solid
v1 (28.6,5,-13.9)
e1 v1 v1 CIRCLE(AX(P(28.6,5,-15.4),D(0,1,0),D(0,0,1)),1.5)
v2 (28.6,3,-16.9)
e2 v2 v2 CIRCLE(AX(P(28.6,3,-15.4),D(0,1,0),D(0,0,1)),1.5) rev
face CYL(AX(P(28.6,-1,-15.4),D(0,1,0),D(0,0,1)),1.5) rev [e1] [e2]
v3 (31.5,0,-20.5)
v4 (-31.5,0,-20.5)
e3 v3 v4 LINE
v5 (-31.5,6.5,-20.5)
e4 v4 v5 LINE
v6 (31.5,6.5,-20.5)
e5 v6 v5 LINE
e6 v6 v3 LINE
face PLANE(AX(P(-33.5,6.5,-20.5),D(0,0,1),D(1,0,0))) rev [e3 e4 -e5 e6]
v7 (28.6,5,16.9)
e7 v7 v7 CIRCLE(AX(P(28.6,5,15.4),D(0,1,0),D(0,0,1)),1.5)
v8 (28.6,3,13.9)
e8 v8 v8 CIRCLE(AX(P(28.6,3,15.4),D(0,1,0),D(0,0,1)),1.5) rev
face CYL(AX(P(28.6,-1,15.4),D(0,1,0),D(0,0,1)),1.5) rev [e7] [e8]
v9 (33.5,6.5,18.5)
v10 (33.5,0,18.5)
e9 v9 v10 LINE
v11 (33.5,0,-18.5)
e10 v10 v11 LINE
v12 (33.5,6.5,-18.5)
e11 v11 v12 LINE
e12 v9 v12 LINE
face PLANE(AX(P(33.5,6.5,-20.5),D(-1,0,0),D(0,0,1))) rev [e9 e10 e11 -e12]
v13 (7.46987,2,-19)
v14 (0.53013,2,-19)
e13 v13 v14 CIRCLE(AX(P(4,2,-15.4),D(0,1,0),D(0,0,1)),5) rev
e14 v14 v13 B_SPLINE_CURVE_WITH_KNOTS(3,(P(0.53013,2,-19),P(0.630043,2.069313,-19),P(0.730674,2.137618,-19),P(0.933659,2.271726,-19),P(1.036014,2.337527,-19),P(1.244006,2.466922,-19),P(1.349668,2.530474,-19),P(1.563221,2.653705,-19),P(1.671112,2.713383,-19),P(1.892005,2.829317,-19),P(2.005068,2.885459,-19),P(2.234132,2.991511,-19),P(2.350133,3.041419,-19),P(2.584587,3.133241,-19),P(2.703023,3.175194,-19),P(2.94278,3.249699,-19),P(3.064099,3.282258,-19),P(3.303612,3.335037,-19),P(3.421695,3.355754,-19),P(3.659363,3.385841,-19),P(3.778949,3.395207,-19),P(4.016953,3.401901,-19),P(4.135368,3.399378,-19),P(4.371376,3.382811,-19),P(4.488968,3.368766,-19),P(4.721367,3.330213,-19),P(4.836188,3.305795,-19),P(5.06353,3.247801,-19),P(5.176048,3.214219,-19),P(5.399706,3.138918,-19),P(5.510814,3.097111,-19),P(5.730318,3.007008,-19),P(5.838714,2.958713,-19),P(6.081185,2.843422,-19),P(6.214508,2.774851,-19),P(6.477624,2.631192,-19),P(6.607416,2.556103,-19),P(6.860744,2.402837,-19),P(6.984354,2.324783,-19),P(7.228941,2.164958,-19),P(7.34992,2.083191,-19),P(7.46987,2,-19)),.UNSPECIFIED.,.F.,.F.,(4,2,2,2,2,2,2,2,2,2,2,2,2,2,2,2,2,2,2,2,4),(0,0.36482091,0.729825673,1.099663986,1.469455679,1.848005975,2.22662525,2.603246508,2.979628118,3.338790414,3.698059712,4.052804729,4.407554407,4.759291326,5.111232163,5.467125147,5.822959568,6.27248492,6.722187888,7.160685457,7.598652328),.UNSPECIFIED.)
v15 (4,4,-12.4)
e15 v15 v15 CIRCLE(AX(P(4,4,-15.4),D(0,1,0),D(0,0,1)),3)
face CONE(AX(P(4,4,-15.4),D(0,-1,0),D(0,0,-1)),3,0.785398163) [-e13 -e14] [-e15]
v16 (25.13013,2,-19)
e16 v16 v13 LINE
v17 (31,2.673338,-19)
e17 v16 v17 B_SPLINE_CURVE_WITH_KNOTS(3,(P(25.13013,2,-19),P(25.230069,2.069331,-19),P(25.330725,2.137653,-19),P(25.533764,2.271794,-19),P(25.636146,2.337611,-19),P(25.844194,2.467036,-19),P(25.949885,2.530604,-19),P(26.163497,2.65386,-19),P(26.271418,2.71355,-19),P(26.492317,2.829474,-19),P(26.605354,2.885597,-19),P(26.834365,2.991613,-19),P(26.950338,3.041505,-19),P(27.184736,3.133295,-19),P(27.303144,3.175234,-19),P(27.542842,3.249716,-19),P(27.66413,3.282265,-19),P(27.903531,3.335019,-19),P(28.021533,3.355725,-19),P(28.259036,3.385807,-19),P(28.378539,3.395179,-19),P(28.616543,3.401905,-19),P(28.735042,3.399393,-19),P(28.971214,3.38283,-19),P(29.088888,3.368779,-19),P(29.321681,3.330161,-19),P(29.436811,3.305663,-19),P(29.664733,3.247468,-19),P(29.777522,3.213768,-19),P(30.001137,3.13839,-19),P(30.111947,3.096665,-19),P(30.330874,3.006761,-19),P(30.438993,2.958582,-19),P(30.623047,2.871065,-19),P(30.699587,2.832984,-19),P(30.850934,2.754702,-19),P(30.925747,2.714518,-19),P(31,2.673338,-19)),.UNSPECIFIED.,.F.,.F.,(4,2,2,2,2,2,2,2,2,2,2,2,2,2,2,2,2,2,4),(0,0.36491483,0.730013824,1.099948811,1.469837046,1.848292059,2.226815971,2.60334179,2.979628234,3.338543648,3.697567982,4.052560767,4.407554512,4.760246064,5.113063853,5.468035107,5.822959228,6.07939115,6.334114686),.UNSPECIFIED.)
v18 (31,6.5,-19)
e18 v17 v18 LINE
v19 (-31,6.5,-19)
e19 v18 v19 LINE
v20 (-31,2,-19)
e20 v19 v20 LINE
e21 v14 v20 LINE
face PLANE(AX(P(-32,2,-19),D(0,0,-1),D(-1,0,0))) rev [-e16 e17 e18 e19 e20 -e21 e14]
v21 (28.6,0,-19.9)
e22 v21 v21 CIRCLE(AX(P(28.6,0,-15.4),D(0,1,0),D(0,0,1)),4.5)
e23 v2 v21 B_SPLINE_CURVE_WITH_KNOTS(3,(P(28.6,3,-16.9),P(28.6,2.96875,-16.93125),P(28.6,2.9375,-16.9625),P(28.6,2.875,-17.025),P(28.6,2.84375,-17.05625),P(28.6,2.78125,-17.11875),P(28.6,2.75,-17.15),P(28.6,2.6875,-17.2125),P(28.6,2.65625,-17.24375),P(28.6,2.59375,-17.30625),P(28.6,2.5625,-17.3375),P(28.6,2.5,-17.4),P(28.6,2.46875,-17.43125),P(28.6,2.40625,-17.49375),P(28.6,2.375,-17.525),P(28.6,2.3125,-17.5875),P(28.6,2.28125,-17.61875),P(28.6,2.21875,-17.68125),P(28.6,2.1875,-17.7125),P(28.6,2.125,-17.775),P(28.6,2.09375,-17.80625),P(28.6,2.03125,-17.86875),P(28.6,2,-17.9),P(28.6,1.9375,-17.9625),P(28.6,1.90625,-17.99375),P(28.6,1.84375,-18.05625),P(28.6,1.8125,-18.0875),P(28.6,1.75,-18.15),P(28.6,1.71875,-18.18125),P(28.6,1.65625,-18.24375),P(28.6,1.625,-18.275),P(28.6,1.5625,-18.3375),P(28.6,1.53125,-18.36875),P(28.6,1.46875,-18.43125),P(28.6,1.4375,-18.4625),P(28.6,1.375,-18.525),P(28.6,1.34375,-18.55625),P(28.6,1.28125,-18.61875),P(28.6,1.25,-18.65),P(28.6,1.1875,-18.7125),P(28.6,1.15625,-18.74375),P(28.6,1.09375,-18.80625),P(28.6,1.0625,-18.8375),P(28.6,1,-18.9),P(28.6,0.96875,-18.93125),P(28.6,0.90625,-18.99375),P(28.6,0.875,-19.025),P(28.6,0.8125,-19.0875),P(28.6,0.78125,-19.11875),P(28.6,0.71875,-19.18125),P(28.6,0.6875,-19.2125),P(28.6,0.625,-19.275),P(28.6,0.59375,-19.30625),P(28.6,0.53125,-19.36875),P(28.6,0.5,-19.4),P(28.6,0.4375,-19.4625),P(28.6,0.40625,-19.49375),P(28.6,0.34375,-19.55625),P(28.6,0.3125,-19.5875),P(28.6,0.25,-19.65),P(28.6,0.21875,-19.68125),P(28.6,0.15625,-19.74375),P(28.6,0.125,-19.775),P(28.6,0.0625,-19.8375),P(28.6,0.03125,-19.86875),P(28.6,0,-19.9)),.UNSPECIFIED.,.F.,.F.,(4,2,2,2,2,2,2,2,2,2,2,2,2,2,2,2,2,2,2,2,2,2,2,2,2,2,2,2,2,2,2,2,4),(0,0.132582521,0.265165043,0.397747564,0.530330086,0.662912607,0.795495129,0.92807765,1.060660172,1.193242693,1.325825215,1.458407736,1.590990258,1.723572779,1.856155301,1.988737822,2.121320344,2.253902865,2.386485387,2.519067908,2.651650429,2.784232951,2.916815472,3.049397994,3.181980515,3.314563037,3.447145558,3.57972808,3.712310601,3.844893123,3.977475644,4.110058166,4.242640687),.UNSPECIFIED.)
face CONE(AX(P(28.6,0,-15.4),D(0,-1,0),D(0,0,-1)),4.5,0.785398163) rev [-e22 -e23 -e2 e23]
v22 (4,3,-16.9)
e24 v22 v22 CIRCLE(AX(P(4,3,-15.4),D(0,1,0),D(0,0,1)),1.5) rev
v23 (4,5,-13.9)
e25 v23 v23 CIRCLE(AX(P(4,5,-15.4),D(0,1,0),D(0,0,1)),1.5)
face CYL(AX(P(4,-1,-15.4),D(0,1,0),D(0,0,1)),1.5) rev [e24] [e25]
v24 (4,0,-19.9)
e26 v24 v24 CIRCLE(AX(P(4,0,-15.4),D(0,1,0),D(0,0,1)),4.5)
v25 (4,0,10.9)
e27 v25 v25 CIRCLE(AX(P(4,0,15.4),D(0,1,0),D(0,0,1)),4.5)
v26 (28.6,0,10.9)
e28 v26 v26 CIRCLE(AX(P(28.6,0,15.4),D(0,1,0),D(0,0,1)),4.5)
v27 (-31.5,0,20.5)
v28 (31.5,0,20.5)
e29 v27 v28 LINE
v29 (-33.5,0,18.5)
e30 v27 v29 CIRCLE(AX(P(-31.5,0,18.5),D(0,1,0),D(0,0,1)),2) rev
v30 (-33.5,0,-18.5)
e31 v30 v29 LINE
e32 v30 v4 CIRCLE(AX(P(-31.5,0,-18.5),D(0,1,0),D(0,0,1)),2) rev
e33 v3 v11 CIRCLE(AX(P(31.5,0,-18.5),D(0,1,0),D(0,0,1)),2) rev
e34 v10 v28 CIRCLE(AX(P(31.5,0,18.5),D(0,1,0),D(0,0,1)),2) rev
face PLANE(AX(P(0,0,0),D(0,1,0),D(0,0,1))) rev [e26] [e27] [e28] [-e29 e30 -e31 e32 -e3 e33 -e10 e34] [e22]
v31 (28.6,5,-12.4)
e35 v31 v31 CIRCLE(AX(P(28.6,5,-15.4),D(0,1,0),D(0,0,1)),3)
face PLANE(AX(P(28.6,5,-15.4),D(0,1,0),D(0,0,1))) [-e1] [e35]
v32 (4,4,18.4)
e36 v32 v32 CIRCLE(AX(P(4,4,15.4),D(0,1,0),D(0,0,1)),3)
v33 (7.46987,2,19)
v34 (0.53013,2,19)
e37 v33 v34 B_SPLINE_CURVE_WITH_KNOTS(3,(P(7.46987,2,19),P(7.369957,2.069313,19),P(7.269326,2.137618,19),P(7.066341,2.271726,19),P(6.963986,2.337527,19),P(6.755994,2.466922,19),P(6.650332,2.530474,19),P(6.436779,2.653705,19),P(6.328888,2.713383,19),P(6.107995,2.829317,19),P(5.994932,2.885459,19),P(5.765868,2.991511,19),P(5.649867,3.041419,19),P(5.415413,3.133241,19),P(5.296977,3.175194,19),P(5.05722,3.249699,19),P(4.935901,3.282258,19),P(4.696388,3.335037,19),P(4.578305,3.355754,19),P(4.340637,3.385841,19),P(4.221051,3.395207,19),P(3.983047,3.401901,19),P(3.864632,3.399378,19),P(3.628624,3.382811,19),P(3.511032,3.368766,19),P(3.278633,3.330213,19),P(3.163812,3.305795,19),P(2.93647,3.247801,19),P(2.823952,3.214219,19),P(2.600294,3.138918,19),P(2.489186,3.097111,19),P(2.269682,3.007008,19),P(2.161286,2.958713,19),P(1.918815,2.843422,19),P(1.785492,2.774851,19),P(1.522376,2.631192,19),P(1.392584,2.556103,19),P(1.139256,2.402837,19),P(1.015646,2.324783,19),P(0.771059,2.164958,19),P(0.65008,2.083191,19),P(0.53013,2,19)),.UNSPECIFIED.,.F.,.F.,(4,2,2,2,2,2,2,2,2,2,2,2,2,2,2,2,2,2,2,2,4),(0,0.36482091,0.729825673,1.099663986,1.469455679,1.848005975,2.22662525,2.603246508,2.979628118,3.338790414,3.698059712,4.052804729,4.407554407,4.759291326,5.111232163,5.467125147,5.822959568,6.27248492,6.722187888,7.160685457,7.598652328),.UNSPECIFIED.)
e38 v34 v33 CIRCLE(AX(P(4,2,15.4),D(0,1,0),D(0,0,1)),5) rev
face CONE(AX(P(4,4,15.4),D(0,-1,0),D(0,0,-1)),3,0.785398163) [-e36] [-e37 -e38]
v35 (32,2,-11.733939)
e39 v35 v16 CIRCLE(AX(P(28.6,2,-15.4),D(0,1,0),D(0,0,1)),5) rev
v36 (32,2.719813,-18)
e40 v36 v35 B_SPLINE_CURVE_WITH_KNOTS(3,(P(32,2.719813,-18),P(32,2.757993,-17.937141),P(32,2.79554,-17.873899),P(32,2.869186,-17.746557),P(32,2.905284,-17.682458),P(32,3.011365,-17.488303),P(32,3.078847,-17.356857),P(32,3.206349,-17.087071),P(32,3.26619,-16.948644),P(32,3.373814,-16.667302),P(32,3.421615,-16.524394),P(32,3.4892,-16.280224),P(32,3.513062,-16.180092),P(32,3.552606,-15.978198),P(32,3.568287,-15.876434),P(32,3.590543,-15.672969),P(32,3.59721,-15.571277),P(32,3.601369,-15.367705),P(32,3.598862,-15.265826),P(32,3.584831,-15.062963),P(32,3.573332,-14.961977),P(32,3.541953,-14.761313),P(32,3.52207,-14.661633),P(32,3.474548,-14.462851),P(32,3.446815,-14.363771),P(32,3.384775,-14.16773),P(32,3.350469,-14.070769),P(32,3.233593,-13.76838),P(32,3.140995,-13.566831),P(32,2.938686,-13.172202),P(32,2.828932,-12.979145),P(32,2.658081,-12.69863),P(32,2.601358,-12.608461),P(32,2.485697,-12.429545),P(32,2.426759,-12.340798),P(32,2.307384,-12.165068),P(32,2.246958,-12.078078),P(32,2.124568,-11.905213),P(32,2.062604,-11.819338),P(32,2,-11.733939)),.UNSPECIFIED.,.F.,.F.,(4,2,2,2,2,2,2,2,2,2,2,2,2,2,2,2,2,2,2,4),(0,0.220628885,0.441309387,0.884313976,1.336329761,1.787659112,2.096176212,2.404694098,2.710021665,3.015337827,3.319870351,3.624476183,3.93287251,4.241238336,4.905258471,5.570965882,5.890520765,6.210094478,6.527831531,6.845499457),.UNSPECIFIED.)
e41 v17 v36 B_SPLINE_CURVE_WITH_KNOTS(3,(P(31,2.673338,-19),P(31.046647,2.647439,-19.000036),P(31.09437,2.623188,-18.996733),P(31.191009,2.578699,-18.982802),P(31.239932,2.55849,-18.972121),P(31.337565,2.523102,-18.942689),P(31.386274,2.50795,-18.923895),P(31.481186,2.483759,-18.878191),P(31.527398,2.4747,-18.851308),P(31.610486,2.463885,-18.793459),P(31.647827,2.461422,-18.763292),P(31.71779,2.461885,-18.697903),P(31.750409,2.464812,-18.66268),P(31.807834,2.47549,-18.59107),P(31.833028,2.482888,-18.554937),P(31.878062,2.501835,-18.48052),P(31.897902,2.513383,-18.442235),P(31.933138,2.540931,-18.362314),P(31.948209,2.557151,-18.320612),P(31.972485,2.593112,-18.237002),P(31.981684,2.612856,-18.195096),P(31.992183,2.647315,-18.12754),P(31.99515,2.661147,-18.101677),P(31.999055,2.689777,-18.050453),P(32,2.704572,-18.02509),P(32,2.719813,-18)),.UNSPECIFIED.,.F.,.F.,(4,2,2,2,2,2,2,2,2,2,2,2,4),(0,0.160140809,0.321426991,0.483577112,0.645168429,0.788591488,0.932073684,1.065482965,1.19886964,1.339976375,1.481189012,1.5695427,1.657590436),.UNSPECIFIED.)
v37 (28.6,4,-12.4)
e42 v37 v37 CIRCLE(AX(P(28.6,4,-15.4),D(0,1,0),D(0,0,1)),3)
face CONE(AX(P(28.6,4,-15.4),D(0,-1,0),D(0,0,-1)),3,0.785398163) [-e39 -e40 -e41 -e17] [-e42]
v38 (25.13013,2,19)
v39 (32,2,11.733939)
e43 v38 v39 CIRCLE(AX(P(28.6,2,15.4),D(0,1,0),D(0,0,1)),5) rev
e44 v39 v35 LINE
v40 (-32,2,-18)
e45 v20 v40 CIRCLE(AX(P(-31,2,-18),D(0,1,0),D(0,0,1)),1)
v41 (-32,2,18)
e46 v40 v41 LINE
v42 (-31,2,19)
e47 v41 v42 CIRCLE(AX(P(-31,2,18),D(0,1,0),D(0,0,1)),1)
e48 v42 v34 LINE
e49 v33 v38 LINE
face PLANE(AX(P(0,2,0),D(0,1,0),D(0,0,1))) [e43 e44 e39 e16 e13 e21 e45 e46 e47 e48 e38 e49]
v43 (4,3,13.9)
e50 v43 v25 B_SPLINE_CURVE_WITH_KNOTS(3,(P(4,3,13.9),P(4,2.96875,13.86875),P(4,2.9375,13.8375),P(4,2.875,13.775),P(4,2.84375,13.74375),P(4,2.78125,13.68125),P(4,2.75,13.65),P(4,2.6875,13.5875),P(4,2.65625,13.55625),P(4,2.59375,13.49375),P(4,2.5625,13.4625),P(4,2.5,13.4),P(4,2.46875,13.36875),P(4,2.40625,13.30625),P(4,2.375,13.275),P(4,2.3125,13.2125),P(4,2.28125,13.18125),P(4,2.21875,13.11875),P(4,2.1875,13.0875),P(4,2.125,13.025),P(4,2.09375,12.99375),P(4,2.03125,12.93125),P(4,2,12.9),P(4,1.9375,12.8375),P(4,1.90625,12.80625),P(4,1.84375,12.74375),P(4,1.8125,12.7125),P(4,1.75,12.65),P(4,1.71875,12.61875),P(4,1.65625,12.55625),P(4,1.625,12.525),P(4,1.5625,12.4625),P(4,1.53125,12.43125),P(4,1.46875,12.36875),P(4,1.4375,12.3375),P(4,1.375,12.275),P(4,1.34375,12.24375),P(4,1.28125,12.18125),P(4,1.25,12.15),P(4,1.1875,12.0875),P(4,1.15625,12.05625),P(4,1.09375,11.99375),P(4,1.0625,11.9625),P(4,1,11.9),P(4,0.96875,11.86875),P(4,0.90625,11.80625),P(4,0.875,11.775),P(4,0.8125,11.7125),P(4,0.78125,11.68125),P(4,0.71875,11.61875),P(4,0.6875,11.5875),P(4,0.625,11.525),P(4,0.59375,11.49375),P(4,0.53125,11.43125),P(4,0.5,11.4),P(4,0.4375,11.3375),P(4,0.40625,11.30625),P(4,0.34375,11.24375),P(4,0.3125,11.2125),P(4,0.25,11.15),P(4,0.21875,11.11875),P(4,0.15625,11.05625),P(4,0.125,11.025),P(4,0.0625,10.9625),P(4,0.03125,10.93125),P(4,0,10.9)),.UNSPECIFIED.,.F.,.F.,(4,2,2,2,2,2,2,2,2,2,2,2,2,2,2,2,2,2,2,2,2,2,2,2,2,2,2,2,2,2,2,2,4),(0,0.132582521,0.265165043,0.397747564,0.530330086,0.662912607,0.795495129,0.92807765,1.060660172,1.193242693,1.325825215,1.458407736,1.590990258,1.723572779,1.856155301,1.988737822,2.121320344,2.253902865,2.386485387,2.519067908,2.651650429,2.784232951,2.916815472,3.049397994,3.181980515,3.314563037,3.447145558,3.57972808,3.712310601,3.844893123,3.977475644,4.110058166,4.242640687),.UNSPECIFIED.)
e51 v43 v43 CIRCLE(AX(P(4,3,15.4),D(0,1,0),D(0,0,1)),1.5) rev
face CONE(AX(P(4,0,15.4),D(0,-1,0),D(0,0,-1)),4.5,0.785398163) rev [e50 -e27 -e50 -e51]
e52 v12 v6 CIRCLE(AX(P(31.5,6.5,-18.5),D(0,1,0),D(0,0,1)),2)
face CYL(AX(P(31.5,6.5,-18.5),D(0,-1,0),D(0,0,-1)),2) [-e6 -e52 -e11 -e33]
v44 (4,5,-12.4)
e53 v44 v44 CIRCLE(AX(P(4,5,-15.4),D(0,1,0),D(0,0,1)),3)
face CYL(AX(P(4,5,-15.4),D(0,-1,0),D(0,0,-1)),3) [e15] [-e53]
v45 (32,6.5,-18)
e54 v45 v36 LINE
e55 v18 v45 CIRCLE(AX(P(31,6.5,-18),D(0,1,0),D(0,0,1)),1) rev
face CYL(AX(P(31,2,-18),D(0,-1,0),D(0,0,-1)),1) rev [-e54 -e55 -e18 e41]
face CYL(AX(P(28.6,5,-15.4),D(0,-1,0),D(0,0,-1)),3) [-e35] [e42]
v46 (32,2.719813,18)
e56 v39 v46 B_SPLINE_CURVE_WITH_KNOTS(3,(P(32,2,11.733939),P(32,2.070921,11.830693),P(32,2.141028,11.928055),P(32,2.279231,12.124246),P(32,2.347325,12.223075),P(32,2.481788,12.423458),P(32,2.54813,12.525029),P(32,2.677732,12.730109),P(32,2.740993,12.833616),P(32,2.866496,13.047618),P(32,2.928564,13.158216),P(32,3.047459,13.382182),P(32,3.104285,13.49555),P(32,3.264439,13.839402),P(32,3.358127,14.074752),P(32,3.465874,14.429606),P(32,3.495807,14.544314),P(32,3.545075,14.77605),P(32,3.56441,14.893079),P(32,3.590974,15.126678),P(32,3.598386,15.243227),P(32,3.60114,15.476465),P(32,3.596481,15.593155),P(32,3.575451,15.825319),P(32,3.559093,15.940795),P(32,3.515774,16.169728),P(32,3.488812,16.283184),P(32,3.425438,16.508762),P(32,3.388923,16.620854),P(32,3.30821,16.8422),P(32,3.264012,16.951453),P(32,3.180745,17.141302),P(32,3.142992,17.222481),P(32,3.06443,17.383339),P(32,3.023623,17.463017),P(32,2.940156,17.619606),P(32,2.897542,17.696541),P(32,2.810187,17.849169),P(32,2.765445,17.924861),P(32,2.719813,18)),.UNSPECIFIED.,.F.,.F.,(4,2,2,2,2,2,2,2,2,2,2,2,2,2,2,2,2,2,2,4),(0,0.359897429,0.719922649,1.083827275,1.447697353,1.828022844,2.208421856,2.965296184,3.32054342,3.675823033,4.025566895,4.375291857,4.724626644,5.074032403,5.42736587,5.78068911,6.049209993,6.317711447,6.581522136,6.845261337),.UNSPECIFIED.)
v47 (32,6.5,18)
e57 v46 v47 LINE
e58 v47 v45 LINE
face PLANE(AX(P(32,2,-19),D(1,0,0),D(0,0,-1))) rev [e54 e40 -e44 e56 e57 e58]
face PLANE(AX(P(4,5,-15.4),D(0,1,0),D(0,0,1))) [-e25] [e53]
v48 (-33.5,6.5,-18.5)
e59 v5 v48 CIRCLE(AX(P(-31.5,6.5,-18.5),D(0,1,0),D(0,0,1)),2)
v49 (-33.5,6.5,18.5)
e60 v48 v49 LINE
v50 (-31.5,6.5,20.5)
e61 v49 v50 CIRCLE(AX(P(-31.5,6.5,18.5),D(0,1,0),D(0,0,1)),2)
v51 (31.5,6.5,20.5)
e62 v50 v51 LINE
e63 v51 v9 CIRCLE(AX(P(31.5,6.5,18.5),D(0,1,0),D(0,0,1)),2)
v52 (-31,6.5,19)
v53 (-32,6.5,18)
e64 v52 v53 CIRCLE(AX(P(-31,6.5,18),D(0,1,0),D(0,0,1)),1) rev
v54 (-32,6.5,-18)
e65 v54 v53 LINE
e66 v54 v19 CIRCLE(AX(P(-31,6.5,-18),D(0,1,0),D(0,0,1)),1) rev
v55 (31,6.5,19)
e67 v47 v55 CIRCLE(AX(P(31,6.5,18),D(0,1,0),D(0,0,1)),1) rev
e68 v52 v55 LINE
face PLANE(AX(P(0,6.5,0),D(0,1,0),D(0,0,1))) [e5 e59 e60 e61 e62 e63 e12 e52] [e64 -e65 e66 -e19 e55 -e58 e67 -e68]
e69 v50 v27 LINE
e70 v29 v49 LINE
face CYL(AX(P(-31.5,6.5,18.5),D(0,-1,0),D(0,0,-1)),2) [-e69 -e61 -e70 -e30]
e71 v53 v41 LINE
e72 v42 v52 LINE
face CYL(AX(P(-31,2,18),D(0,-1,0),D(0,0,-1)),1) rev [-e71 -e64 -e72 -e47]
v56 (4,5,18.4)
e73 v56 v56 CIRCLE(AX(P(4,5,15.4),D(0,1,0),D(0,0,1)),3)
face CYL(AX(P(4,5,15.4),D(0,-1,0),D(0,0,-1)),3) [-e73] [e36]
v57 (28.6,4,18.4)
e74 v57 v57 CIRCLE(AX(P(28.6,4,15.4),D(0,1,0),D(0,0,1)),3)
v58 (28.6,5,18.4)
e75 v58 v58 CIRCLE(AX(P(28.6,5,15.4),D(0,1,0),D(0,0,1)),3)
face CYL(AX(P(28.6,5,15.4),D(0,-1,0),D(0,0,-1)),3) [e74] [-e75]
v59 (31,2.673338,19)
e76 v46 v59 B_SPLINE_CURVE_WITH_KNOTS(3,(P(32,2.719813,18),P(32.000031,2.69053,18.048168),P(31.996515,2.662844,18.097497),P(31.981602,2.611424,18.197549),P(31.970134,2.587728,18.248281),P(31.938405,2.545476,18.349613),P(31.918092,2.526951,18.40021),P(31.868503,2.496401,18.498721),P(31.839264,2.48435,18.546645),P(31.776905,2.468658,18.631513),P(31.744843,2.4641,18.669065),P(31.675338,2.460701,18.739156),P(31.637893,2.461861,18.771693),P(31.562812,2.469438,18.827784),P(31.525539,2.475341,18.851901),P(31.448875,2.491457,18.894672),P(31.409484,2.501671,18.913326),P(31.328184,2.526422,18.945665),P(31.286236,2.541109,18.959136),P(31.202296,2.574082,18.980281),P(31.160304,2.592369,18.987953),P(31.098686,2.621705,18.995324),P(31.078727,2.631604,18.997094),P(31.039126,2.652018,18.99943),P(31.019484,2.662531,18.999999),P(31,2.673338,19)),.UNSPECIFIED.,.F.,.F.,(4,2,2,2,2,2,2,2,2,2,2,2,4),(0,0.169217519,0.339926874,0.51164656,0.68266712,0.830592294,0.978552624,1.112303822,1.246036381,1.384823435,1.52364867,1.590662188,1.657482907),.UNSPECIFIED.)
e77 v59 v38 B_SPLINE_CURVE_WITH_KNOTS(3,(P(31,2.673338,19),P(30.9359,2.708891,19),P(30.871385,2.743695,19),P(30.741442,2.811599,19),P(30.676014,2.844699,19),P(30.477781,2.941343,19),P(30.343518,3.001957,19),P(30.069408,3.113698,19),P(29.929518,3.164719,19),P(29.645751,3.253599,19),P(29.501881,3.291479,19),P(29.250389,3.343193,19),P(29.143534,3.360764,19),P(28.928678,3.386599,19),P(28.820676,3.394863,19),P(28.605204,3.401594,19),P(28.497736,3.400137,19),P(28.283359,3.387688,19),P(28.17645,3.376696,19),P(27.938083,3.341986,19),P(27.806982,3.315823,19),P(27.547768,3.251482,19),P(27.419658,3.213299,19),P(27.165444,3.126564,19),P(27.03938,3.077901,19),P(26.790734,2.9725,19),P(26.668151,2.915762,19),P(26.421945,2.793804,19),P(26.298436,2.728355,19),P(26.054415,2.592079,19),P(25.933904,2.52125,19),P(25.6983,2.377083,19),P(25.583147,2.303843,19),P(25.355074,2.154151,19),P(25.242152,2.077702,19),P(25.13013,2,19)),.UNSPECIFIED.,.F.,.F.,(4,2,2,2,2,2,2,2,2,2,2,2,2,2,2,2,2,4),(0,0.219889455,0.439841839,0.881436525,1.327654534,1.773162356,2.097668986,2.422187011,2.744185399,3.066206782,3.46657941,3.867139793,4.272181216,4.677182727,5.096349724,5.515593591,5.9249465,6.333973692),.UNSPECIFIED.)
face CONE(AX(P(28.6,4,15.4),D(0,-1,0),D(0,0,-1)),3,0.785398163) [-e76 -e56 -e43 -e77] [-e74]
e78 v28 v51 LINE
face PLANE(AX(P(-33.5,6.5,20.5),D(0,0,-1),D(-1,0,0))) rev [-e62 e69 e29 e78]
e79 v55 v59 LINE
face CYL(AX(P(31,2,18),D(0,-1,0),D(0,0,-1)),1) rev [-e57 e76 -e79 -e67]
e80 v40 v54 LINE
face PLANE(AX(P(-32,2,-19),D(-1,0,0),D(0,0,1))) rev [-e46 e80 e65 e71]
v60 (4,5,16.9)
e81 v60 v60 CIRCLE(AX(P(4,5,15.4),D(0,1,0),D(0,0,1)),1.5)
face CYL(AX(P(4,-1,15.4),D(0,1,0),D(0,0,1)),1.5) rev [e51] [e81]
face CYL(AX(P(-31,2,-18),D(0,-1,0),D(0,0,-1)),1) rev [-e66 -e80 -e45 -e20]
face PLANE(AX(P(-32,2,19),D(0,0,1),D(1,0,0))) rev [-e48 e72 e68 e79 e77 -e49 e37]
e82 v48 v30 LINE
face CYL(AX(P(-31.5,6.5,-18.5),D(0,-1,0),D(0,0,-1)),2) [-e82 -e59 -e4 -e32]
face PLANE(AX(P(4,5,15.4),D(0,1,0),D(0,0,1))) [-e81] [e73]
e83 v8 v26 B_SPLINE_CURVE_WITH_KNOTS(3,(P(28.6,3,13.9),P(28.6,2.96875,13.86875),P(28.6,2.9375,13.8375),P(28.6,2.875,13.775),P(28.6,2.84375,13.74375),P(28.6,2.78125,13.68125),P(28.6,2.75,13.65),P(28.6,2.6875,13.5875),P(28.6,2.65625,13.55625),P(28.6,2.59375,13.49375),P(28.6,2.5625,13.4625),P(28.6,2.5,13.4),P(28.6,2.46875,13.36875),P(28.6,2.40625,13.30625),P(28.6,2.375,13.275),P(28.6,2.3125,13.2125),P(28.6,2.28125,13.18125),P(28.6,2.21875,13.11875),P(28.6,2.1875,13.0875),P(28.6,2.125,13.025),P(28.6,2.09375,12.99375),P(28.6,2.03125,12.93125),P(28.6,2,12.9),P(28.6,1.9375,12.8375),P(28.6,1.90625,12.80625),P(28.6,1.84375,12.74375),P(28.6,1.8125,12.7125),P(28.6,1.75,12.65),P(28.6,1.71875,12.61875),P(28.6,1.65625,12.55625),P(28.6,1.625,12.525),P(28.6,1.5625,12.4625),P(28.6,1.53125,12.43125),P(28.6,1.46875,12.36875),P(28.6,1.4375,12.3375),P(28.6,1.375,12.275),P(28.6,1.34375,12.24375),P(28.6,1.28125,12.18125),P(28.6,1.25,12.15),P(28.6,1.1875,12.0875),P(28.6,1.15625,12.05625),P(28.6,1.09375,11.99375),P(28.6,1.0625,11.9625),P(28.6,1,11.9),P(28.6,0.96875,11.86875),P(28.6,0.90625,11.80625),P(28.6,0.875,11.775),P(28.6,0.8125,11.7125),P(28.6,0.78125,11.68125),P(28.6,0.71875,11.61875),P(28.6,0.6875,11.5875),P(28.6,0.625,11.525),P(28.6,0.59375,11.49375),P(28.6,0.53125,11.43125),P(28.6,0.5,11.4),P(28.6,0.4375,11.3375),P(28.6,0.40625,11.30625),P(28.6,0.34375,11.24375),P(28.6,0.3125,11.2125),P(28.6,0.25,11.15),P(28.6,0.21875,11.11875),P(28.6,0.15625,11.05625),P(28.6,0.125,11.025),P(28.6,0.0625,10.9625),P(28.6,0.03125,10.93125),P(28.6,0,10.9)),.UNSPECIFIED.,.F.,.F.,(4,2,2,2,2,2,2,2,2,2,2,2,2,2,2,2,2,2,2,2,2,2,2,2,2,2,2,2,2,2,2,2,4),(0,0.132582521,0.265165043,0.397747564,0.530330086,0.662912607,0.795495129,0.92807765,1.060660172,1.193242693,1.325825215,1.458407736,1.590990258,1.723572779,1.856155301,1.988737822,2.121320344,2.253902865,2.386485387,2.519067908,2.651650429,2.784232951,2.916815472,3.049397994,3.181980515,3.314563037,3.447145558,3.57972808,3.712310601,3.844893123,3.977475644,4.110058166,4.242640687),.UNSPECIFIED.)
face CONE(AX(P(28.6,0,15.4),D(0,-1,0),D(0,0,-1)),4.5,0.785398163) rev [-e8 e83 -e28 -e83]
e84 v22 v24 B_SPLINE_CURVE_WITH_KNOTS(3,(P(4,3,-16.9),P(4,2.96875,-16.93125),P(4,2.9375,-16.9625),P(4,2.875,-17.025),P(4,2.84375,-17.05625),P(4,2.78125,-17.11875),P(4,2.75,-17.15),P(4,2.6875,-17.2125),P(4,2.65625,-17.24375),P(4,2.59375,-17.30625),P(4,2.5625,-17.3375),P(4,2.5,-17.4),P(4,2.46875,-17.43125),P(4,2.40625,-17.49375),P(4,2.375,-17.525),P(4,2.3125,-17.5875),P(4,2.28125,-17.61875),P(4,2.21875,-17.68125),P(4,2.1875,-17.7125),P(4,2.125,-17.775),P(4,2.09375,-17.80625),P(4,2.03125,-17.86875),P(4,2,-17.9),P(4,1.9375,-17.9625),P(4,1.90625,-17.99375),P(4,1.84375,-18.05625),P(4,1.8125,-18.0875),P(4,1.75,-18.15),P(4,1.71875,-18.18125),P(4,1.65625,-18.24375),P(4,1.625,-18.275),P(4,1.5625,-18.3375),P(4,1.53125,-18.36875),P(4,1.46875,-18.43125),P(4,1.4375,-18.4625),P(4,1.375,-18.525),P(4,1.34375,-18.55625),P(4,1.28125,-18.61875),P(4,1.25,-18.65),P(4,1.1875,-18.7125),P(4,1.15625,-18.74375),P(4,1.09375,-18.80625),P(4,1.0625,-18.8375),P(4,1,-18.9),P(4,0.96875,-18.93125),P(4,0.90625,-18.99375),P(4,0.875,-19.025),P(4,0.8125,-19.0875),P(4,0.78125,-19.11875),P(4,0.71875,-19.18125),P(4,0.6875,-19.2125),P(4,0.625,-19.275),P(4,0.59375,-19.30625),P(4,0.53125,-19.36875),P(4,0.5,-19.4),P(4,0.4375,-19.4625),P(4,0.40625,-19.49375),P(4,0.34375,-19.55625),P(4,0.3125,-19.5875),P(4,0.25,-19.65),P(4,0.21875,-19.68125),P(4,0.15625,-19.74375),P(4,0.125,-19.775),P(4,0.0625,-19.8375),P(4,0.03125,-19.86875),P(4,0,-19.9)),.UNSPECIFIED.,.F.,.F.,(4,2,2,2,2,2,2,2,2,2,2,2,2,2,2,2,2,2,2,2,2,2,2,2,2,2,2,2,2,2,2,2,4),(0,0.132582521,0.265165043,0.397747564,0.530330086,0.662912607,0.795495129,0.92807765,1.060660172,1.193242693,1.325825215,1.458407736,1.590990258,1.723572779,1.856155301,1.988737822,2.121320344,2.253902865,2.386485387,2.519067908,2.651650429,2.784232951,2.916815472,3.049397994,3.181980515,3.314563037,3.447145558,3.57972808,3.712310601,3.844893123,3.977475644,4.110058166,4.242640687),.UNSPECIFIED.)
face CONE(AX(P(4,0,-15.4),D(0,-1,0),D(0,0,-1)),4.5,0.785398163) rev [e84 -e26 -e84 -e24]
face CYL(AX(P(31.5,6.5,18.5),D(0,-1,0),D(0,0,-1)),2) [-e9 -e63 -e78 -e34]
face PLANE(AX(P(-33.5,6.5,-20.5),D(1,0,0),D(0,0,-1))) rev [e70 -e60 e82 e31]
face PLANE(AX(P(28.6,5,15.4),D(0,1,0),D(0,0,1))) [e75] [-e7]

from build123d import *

# Parameters (mm, degrees)
SKETCH_1_W          = 67
SKETCH_1_H          = 41
EXTRUDE_1_DEPTH     = 6.5
SKETCH_2_W          = 64
SKETCH_2_H          = 38
CUT_EXTRUDE_1_DEPTH = 4.5
FILLET_1_R          = 1
FILLET_2_R          = 2
SKETCH_3_R          = 3
EXTRUDE_2_DEPTH     = 3
SKETCH_4_R          = 1.5
CUT_EXTRUDE_2_DEPTH = 6
CHAMFER_1_SIZE      = 3
CHAMFER_2_SIZE      = 2


with BuildPart() as part:
    # Эскиз1 → Бобышка-Вытянуть1 (new body)
    with BuildSketch(Plane(origin=(0, 0, 0), x_dir=(1, 0, 0), z_dir=(0, 1, 0))):
        Rectangle(SKETCH_1_W, SKETCH_1_H)
    extrude(amount=EXTRUDE_1_DEPTH)

    # Эскиз2 → Вырез-Вытянуть1 (cut)
    with BuildSketch(Plane(origin=(0, 6.5, 0), x_dir=(1, 0, 0), z_dir=(0, 1, 0))):
        Rectangle(SKETCH_2_W, SKETCH_2_H)
    extrude(amount=-CUT_EXTRUDE_1_DEPTH, mode=Mode.SUBTRACT)

    # Скругление1
    fillet_1_edges = [part.edges().sort_by_distance(p)[0] for p in [
        (32, 4.25, -19),
        (32, 4.25, 19),
        (-32, 4.25, 19),
        (-32, 4.25, -19),
    ]]
    fillet(fillet_1_edges, radius=FILLET_1_R)

    # Скругление2
    fillet_2_edges = [part.edges().sort_by_distance(p)[0] for p in [
        (33.5, 3.25, 20.5),
        (-33.5, 3.25, 20.5),
        (-33.5, 3.25, -20.5),
        (33.5, 3.25, -20.5),
    ]]
    fillet(fillet_2_edges, radius=FILLET_2_R)

    # Эскиз3 → Бобышка-Вытянуть2 (add)
    with BuildSketch(Plane(origin=(0, 2, 0), x_dir=(1, 0, 0), z_dir=(0, 1, 0))):
        with Locations(Location((28.6, 15.4, 0), (0, 0, 270))):
            Circle(SKETCH_3_R)
        with Locations(Location((4, 15.4, 0), (0, 0, 270))):
            Circle(SKETCH_3_R)
        with Locations(Location((4, -15.4, 0), (0, 0, 270))):
            Circle(SKETCH_3_R)
        with Locations(Location((28.6, -15.4, 0), (0, 0, 270))):
            Circle(SKETCH_3_R)
    extrude(amount=EXTRUDE_2_DEPTH)

    # Эскиз4 → Вырез-Вытянуть2 (cut)
    with BuildSketch(Plane(origin=(0, 5, 0), x_dir=(1, 0, 0), z_dir=(0, 1, 0))):
        with Locations(Location((4, 15.4, 0), (0, 0, 270))):
            Circle(SKETCH_4_R)
        with Locations(Location((28.6, 15.4, 0), (0, 0, 270))):
            Circle(SKETCH_4_R)
        with Locations(Location((28.6, -15.4, 0), (0, 0, 270))):
            Circle(SKETCH_4_R)
        with Locations(Location((4, -15.4, 0), (0, 0, 270))):
            Circle(SKETCH_4_R)
    extrude(amount=-CUT_EXTRUDE_2_DEPTH, mode=Mode.SUBTRACT)

    # Фаска1
    chamfer_1_edges = [part.edges().sort_by_distance(p)[0] for p in [
        (28.6, 0, -16.9),
        (4, 0, -16.9),
        (4, 0, 13.9),
        (28.6, 0, 13.9),
    ]]
    chamfer(chamfer_1_edges, length=CHAMFER_1_SIZE)

    # Фаска2
    # the kernel refuses this chamfer: 2 mm, written as the material it adds along each edge
    with BuildSketch(Plane(origin=(28.6, 2, -15.4), x_dir=(0, 0, 1), z_dir=(-1, 0, 0))) as chamfer_2_piece_1_section:
        Polygon((3, CHAMFER_2_SIZE), (3 + CHAMFER_2_SIZE, 0), (3, 0), align=None)
    chamfer_2_piece_1 = revolve(axis=Axis((28.6, 2, -15.4), (0, 1, 0)), mode=Mode.PRIVATE)
    chamfer_2_piece_1 = split(chamfer_2_piece_1, bisect_by=Plane(origin=(32, 3.643767664, -12.314318949), z_dir=(-1, 0, 0)), keep=Keep.TOP, mode=Mode.PRIVATE)
    add(chamfer_2_piece_1)
    with BuildSketch(Plane(origin=(4, 2, -15.4), x_dir=(0, 0, 1), z_dir=(-1, 0, 0))) as chamfer_2_piece_2:
        Polygon((3 + CHAMFER_2_SIZE, 0), (3, CHAMFER_2_SIZE), (3, 0), align=None)
    revolve(axis=Axis((4, 2, -15.4), (0, 1, 0)))
    with BuildSketch(Plane(origin=(28.6, 2, 15.4), x_dir=(0, 0, 1), z_dir=(-1, 0, 0))) as chamfer_2_piece_3_section:
        Polygon((3 + CHAMFER_2_SIZE, 0), (3, CHAMFER_2_SIZE), (3, 0), align=None)
    chamfer_2_piece_3 = revolve(axis=Axis((28.6, 2, 15.4), (0, 1, 0)), mode=Mode.PRIVATE)
    chamfer_2_piece_3 = split(chamfer_2_piece_3, bisect_by=Plane(origin=(32, 3.313770234, 18.884228213), z_dir=(-1, 0, 0)), keep=Keep.TOP, mode=Mode.PRIVATE)
    add(chamfer_2_piece_3)
    with BuildSketch(Plane(origin=(4, 2, 15.4), x_dir=(0, 0, 1), z_dir=(-1, 0, 0))) as chamfer_2_piece_4:
        Polygon((3 + CHAMFER_2_SIZE, 0), (3, CHAMFER_2_SIZE), (3, 0), align=None)
    revolve(axis=Axis((4, 2, 15.4), (0, 1, 0)))


solid = part.part
